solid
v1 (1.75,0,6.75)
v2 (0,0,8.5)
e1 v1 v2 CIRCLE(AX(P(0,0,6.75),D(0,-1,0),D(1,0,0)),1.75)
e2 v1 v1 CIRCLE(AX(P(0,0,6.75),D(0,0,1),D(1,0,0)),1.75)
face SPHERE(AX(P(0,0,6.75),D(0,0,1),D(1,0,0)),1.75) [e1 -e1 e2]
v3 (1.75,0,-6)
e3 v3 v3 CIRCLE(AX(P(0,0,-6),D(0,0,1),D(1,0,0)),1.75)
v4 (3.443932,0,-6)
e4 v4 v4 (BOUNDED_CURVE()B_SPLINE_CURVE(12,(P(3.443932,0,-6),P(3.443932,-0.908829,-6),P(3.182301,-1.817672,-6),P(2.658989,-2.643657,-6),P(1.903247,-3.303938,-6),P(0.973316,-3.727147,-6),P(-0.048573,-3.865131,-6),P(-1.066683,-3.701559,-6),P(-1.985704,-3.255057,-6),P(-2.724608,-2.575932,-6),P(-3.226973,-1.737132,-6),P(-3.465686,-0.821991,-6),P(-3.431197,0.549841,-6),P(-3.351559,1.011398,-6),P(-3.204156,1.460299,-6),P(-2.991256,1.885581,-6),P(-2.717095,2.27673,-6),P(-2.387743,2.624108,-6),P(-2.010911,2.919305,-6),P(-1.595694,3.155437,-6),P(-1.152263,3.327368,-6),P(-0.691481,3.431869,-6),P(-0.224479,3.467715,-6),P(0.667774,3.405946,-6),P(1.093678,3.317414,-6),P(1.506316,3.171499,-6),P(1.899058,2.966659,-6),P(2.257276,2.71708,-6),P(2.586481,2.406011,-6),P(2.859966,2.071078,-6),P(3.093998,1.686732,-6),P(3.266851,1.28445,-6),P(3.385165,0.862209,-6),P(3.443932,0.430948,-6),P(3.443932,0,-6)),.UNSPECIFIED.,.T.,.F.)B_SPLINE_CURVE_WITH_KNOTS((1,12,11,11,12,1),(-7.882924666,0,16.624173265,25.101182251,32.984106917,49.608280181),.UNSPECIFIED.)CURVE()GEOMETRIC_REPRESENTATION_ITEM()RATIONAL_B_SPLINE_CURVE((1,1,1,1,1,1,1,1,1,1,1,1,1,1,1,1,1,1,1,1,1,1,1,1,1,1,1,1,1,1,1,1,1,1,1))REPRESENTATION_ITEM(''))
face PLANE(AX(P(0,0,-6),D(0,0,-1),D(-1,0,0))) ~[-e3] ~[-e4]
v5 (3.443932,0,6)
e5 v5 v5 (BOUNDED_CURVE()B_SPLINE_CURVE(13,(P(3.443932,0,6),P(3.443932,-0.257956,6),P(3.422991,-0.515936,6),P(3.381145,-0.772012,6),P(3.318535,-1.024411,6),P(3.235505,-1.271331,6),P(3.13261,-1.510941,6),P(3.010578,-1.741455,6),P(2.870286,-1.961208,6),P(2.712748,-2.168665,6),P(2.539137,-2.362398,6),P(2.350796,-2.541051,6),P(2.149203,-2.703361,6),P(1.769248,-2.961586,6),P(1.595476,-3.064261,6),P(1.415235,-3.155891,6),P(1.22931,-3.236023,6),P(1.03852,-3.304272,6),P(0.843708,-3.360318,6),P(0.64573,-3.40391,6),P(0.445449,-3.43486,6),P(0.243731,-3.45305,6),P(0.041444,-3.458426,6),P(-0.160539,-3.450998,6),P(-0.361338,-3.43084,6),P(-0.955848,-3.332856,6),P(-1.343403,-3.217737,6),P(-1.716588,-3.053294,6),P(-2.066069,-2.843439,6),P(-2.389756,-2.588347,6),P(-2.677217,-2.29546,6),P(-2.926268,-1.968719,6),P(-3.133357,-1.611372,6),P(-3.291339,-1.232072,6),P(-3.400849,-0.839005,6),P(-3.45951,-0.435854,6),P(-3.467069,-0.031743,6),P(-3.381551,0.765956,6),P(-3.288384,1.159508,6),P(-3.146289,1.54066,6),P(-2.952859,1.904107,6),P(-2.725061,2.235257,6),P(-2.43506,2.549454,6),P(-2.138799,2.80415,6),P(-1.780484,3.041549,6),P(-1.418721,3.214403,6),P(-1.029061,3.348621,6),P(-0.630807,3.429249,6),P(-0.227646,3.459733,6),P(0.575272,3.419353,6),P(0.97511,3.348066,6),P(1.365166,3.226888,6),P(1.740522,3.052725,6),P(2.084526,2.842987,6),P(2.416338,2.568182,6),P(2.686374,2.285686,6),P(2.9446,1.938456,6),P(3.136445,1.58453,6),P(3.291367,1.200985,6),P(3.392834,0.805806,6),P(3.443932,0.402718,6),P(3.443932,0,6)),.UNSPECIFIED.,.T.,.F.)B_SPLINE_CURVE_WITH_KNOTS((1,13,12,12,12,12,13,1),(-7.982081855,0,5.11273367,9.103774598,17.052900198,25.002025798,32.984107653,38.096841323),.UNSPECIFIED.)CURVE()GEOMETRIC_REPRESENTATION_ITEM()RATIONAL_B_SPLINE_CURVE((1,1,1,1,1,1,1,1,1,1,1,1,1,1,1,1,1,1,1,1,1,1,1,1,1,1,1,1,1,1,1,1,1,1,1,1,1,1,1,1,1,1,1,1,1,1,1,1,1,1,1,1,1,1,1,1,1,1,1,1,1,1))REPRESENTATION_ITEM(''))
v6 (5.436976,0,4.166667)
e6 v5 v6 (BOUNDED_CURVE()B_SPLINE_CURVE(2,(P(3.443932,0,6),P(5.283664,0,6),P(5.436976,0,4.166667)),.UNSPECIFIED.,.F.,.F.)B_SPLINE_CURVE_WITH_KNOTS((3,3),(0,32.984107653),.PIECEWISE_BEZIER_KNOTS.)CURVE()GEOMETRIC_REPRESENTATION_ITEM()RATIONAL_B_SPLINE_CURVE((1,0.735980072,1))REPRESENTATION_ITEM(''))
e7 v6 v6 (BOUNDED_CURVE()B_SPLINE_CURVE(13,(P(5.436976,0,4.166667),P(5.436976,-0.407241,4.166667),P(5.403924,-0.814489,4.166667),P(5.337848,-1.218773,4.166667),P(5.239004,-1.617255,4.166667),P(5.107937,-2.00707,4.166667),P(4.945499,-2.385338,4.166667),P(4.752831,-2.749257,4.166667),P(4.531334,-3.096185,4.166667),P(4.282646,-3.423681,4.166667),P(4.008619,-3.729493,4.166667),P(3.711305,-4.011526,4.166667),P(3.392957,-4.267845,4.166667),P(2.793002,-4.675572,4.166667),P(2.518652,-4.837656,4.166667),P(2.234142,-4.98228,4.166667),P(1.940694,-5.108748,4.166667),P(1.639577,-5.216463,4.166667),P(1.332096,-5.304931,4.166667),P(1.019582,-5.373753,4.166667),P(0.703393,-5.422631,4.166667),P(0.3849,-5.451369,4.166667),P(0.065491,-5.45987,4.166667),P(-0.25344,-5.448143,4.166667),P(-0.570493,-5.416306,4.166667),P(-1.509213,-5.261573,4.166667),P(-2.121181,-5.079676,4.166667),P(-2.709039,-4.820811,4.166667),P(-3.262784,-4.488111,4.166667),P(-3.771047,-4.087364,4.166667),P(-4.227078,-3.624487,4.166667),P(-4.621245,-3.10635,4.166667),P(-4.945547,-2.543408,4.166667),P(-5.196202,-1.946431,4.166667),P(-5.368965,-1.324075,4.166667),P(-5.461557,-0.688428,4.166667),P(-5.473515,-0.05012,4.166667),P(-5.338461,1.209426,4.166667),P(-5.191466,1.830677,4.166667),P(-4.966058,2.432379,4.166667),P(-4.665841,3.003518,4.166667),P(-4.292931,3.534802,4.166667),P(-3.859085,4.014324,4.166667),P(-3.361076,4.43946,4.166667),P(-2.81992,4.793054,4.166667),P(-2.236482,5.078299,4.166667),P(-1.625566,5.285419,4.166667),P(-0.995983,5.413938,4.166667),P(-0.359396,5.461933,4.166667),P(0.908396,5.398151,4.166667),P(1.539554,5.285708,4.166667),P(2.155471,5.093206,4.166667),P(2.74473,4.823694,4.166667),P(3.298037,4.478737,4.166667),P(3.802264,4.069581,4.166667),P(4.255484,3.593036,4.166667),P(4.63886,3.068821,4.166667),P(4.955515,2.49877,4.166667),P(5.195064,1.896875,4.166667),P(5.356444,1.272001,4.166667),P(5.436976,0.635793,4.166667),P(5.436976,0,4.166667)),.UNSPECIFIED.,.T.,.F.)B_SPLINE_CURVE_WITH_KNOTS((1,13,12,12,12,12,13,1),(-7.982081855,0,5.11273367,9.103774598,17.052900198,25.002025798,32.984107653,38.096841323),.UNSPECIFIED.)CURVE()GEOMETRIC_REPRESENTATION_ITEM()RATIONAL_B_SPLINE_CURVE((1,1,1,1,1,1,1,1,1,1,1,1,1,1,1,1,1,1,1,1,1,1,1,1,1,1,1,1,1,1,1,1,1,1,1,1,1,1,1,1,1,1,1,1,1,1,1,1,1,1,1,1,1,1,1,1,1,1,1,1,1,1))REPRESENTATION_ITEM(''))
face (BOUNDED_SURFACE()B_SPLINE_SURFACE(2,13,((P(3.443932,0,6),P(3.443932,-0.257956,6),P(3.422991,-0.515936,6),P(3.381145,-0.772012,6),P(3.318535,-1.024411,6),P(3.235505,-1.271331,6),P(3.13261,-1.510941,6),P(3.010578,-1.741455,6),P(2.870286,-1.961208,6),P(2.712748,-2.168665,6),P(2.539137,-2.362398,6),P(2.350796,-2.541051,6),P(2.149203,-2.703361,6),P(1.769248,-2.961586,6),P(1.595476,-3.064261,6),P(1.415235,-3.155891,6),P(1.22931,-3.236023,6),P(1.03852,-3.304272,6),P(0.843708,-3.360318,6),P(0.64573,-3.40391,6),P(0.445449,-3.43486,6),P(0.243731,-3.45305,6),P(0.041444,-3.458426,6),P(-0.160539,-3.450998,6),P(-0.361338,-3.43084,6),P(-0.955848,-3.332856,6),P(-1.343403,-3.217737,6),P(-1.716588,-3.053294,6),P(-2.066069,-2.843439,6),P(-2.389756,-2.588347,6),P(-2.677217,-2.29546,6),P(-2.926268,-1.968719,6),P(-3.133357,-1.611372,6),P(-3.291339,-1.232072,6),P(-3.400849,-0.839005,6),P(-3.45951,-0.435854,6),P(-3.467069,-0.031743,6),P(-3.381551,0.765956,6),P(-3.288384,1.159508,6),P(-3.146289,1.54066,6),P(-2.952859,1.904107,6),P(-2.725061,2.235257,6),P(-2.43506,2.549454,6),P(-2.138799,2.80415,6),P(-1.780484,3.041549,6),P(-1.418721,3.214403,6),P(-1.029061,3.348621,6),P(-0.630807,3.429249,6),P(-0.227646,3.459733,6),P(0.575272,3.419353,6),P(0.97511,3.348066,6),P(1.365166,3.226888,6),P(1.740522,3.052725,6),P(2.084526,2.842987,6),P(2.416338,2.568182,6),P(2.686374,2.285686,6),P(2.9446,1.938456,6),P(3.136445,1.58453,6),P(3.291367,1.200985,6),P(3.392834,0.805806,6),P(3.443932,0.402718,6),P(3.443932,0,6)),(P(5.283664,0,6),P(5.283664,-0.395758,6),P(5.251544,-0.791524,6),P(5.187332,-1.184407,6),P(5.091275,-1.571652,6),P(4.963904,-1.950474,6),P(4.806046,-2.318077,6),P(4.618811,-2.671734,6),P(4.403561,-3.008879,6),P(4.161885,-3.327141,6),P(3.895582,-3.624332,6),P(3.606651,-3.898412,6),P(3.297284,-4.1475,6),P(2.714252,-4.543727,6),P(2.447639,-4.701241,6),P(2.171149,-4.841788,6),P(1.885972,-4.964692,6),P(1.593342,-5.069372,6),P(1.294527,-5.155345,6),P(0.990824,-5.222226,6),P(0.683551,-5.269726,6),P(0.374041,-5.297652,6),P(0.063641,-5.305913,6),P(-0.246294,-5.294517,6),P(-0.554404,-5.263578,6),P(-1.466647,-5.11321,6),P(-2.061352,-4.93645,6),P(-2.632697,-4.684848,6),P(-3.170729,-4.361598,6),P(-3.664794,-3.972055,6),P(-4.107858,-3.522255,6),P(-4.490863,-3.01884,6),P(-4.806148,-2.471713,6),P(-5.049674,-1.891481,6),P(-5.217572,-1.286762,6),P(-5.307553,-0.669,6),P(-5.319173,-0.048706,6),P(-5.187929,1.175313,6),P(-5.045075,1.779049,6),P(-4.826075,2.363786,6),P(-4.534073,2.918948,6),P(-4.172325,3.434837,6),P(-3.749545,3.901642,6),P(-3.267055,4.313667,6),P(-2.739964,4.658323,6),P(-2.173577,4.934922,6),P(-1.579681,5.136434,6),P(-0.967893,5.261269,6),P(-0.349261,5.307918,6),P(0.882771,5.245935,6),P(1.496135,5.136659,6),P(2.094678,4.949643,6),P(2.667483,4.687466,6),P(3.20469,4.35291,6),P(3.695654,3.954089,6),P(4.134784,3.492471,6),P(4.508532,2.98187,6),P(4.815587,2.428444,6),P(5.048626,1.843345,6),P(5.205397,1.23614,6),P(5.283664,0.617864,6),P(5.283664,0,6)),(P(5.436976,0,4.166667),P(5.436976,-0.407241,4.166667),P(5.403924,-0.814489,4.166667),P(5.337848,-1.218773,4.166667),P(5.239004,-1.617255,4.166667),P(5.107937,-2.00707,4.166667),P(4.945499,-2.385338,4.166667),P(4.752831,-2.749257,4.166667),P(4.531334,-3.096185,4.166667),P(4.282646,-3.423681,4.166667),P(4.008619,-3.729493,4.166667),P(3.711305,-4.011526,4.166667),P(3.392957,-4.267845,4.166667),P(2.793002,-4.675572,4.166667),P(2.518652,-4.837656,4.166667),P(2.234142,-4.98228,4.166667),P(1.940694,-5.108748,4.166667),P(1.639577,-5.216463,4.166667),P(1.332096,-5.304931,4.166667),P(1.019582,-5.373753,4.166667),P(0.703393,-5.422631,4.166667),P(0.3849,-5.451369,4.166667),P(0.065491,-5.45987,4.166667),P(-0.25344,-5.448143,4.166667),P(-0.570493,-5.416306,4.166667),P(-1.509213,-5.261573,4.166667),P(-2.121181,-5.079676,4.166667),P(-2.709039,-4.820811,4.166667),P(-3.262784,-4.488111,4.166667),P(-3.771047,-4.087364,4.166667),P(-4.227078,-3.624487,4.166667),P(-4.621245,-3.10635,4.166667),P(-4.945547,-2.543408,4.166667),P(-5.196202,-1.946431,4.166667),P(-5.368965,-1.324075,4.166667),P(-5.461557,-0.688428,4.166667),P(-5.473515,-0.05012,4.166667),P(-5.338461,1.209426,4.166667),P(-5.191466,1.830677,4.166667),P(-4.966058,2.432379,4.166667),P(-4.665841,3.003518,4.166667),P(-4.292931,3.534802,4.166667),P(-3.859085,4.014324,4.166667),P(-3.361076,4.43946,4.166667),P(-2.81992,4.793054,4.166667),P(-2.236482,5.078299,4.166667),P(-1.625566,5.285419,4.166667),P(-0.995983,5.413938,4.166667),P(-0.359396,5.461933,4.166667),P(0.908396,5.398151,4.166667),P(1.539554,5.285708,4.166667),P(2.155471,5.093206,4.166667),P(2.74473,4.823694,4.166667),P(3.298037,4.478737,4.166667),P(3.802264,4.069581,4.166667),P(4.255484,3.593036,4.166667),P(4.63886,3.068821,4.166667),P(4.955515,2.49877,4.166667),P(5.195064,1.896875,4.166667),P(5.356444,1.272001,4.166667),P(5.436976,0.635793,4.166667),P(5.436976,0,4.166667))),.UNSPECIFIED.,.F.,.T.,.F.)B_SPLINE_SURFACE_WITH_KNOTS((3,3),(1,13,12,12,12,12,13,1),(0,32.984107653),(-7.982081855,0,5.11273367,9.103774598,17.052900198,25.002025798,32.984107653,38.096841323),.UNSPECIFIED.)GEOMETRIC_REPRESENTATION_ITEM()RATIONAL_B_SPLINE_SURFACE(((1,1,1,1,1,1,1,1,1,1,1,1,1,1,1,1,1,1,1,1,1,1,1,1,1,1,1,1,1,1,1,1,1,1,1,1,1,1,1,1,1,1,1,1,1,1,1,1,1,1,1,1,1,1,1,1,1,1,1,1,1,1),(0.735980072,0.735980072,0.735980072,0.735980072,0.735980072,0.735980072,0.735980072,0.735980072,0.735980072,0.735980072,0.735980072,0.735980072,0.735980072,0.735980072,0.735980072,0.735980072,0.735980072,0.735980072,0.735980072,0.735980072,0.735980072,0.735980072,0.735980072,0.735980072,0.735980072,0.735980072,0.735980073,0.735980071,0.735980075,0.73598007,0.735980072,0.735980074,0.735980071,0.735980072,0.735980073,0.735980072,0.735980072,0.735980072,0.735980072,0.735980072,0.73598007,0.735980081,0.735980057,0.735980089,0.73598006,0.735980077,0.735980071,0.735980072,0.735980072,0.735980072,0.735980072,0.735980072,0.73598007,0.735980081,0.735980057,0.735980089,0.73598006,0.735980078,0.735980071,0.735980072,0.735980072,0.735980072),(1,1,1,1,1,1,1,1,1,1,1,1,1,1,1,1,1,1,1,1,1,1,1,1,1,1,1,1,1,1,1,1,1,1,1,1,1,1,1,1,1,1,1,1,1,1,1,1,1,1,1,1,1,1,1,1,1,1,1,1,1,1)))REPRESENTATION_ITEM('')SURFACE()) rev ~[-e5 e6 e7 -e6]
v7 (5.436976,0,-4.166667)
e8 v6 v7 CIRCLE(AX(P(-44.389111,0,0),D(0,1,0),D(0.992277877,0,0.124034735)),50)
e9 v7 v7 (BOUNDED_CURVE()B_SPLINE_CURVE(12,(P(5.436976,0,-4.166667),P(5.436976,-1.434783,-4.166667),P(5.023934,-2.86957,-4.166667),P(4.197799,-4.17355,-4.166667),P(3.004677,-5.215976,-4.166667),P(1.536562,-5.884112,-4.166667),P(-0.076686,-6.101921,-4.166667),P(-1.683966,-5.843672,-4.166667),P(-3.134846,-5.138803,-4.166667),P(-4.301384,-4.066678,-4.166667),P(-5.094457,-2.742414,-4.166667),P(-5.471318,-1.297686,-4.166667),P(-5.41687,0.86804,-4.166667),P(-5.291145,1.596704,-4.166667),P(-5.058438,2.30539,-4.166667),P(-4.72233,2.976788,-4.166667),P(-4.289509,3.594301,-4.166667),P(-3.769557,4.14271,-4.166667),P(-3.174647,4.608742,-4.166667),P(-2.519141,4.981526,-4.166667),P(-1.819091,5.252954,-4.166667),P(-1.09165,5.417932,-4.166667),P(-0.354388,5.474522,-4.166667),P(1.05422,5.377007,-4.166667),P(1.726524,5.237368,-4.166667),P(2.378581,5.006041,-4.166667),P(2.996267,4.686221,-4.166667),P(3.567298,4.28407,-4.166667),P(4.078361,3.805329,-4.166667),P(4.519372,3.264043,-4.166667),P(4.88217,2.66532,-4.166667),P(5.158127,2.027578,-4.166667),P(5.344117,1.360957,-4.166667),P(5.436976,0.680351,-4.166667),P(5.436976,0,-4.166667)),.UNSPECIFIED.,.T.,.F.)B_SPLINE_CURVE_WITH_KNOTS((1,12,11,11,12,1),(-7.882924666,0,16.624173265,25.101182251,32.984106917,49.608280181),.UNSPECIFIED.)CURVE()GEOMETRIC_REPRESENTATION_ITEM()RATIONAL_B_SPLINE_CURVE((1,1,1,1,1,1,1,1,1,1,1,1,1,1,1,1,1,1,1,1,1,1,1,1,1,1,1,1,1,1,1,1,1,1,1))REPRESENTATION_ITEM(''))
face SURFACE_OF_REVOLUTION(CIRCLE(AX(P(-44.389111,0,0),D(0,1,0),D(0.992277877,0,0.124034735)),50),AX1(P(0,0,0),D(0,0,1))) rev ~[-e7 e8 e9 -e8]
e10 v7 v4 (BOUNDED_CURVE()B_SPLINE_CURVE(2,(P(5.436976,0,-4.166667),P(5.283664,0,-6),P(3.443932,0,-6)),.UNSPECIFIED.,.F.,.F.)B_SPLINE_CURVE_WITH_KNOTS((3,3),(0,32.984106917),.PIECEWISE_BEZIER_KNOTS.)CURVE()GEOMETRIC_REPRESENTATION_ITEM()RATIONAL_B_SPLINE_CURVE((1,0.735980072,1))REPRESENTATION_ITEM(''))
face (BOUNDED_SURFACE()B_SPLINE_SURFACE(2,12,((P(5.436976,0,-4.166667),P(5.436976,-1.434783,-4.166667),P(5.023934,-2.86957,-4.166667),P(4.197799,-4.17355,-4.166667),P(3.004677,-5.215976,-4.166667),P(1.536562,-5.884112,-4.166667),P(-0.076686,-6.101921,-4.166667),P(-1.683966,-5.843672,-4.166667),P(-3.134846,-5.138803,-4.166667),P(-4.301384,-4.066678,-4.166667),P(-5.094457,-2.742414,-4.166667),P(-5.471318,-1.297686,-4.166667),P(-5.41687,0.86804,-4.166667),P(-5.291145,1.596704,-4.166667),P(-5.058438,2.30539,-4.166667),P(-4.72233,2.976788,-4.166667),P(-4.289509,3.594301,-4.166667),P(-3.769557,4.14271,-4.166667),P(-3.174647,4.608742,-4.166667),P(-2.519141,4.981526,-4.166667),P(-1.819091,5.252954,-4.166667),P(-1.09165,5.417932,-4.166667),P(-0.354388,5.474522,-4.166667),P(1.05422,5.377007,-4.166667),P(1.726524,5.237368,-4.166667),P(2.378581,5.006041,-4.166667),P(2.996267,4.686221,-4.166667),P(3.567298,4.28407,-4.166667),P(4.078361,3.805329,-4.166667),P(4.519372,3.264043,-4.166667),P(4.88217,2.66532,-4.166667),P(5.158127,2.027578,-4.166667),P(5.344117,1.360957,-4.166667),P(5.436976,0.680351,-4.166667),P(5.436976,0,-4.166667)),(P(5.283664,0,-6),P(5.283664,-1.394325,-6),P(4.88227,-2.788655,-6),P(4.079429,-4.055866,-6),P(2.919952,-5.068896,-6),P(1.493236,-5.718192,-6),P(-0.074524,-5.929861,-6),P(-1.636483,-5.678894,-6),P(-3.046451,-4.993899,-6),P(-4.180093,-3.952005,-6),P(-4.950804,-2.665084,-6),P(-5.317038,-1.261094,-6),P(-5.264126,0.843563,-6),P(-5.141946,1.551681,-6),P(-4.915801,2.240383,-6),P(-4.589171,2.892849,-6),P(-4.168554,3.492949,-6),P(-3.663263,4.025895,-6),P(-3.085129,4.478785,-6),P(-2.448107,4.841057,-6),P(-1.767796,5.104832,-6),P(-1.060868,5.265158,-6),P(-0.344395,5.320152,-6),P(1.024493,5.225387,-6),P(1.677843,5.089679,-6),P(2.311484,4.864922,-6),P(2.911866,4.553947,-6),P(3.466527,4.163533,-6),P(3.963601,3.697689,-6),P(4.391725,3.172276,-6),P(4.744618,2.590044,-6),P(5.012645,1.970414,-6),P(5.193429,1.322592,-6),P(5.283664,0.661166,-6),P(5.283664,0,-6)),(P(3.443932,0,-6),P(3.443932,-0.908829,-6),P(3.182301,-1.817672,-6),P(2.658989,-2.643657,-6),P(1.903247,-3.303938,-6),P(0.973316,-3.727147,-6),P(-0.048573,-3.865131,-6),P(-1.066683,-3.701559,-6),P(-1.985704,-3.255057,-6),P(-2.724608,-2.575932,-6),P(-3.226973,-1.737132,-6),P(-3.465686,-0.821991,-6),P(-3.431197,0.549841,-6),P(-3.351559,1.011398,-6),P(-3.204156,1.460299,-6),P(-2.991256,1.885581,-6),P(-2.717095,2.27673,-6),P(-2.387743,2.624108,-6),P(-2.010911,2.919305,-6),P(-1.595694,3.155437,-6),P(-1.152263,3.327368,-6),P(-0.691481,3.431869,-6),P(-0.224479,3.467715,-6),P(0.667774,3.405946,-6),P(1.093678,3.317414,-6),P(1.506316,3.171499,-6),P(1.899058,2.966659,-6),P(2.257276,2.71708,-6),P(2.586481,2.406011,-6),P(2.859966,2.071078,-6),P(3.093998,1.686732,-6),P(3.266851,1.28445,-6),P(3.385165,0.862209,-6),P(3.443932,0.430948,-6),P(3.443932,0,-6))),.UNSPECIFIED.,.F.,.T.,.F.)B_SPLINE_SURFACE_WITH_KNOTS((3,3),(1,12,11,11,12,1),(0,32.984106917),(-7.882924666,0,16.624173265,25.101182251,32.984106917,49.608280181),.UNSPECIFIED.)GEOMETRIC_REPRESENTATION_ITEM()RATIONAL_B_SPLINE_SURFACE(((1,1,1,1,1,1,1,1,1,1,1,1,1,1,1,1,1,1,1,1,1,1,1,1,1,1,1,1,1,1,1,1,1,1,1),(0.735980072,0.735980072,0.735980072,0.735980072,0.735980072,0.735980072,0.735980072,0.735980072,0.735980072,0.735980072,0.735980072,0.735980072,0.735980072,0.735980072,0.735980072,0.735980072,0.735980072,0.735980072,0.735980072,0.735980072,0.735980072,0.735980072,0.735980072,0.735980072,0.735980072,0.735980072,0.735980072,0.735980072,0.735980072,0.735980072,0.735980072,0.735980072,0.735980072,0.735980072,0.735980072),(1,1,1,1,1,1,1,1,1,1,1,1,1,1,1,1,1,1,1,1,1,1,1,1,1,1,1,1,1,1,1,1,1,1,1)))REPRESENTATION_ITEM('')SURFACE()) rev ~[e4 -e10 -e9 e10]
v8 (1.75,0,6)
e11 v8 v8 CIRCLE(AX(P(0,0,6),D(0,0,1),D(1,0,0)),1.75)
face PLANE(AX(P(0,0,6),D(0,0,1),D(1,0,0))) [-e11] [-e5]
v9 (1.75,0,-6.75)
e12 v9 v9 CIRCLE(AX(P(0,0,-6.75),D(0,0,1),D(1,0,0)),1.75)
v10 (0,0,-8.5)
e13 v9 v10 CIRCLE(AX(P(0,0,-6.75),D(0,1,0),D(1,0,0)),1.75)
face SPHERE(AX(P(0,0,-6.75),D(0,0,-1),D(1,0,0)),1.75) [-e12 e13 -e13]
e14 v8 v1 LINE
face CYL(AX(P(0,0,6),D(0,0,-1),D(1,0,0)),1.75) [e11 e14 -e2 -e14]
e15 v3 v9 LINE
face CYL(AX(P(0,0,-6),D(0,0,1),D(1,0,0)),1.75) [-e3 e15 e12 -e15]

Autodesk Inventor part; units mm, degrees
ref_plane "YZ Plane" through (0, 0, 0) normal (1, 0, 0) x (0, 1, 0)
ref_plane "XZ Plane" through (0, 0, 0) normal (0, 1, 0) x (-1, 0, 0)
sketch "Sketch1" plane through (0, 0, 0) normal (0, 0, 1) x (1, 0, 0)
  circle A0 centre (0, 0) radius 6
  dimension "d0" = 12
ref_plane "Work Plane1" through (0, 0, 6) normal (0, 0, 1) x (1, 0, 0)
sketch "Sketch2" plane through (0, 0, 6) normal (0, 0, 1) x (1, 0, 0)
  circle A0 centre (0, 0) radius 5.25
  dimension "d2" = 10.5
loft "Loft1" add profiles "Sketch1", "Sketch2"
mirror "Mirror1" about plane through (0, 0, 0) normal (0, 0, 1) of "Loft1"
fillet "Fillet1" radius 50 1 edges at (-6, 0, 0)
fillet "Fillet2" radius 2 2 edges at (-5.2496, -0.0003, 6) (-5.2496, -0.0002, -6)
sketch "Sketch3" plane through (0, 0, 6) normal (0, 0, 1) x (1, 0, 0)
  circle A0 centre (0, 0) radius 1.75
  dimension "d9" = 3.5
extrude "Extrusion1" add sketch "Sketch3" along normal blind 2.5
fillet "Fillet3" radius 1.75 1 edges at (-1.75, 0, 8.5)
mirror "Mirror2" about plane through (0, 0, 0) normal (0, 0, 1) of "Extrusion1", "Fillet3"
properties part number "omni_roller_v2"
